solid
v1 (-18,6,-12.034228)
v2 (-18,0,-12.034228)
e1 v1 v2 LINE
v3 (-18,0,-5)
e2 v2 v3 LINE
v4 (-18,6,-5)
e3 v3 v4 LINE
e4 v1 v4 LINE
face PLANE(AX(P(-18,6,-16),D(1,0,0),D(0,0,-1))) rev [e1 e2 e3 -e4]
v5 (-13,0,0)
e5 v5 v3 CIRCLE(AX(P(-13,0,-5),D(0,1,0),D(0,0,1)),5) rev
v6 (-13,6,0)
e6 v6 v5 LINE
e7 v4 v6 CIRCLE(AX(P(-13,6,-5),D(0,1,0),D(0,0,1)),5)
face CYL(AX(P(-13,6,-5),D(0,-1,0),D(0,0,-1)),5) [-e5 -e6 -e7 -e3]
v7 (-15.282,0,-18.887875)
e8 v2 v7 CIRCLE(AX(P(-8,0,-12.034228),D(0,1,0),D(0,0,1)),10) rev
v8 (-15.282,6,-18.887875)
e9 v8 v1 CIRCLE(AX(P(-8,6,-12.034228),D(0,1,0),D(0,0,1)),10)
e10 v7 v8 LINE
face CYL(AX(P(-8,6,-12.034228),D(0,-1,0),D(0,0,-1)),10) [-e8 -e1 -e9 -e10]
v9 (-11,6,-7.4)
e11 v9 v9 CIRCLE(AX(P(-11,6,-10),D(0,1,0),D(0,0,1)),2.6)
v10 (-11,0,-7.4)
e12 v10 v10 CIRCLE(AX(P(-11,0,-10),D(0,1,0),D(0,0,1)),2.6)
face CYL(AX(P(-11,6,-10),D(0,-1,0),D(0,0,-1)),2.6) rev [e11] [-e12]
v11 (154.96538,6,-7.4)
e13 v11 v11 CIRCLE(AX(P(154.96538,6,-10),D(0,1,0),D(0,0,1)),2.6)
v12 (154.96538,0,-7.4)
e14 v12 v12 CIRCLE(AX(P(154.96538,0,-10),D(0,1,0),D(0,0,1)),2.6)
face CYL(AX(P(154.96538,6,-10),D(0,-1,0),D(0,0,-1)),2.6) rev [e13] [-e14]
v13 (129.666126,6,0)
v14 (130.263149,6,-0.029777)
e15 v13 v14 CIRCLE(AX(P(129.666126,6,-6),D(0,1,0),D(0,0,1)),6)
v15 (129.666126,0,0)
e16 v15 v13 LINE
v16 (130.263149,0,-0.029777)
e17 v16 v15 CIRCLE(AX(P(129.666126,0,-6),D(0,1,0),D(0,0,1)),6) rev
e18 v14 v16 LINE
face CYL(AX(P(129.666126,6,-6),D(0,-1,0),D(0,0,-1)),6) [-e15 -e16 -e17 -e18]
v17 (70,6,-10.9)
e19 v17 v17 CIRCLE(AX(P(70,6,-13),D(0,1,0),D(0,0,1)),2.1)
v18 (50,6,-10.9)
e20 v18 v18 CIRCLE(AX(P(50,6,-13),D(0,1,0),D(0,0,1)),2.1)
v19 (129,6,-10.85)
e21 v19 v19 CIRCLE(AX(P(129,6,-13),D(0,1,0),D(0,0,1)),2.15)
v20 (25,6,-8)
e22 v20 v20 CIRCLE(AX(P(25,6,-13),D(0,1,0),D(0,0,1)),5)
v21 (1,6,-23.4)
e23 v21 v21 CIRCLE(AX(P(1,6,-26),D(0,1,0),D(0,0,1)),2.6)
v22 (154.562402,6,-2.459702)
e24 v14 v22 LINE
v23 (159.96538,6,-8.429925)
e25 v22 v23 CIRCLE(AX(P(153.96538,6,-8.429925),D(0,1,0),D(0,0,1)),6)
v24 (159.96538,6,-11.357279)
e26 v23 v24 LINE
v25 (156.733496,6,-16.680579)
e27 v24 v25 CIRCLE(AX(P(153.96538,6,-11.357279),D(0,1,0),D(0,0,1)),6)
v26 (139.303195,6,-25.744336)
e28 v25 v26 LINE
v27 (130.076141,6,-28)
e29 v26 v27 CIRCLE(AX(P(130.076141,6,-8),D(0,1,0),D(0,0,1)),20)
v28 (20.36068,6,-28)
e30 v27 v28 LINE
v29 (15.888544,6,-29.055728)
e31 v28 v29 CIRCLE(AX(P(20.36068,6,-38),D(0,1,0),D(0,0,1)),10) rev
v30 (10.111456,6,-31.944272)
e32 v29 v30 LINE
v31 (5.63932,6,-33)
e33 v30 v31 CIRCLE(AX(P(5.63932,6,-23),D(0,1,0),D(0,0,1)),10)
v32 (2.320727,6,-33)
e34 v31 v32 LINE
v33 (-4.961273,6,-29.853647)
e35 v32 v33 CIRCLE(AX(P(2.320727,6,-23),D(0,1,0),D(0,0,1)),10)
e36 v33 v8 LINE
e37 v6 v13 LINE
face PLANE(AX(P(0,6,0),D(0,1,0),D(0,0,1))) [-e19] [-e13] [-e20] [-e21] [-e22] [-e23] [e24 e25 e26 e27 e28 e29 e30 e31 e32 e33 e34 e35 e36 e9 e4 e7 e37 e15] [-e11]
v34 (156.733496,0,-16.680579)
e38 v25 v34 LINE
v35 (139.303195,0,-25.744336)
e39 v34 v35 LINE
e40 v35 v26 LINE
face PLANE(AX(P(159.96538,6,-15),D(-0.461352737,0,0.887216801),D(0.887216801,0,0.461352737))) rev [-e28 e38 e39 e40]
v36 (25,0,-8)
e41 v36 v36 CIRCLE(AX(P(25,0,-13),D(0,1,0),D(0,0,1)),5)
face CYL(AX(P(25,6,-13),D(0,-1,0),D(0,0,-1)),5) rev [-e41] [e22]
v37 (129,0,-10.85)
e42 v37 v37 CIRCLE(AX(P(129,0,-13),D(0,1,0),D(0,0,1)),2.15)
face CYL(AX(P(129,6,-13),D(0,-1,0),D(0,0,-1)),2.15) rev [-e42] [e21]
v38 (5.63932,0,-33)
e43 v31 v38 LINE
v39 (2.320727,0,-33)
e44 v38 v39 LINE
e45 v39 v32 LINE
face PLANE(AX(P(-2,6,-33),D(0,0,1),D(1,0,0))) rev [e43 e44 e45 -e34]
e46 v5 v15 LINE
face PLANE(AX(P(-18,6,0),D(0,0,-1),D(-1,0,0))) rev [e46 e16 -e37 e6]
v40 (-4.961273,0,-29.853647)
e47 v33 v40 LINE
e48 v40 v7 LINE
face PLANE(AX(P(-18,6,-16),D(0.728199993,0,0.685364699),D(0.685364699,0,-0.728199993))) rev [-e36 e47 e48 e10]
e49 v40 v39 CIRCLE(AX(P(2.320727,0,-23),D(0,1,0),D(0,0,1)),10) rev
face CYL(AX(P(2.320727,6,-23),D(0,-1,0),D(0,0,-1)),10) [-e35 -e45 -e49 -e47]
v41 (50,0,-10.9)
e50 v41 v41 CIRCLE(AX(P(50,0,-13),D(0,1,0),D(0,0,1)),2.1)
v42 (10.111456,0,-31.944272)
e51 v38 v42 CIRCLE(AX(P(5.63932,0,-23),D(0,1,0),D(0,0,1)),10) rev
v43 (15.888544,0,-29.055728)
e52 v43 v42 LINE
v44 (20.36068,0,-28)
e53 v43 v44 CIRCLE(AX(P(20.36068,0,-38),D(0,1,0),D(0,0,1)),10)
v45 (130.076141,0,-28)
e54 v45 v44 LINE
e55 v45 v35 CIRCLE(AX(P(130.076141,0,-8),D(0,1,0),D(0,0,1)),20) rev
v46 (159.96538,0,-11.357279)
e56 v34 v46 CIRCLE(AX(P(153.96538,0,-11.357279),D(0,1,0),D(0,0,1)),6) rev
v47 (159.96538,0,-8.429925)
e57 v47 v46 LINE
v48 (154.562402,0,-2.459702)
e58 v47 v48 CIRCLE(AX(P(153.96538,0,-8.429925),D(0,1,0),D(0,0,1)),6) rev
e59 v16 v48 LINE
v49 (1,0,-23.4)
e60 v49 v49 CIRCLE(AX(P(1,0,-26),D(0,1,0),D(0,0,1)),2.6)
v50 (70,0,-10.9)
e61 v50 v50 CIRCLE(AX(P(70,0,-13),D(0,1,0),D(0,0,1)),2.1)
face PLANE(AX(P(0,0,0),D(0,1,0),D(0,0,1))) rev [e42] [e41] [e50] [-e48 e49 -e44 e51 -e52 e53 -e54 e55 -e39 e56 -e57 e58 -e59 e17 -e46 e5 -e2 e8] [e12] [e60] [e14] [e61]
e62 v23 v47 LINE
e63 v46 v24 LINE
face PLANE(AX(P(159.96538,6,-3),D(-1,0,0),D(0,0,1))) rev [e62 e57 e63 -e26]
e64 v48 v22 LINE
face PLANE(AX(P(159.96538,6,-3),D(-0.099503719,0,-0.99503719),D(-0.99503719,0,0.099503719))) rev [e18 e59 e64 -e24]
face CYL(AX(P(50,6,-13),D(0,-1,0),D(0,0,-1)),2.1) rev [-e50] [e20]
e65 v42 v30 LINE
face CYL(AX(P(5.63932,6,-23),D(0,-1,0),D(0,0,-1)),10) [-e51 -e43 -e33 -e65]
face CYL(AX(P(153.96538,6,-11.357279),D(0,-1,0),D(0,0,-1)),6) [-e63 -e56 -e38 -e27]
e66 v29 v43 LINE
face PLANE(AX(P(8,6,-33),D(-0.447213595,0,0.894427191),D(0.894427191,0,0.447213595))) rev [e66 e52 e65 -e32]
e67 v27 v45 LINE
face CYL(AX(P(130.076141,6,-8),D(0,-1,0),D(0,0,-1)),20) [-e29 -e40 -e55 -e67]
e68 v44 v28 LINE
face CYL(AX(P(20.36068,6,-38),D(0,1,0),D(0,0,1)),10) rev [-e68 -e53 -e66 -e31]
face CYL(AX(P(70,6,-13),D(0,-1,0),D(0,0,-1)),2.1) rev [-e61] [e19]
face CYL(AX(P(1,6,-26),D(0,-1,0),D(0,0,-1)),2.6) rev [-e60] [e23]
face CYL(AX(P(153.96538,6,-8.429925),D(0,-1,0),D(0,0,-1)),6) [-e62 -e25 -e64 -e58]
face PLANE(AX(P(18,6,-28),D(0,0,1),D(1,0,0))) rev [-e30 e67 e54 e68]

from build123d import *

# Parameters (mm, degrees)
SKETCH1_R           = 2.6
SKETCH1_R_2         = 2.15
SKETCH1_R_3         = 5
SKETCH1_R_4         = 2.1
BOSS_EXTRUDE1_DEPTH = 6
FILLET1_R           = 5
FILLET2_R           = 6
FILLET3_R           = 10
FILLET4_R           = 20
FILLET5_R           = 10


with BuildPart() as part:
    # Sketch1 → Boss-Extrude1 (new body)
    with BuildSketch(Plane(origin=(0, 0, 0), x_dir=(1, 0, 0), z_dir=(0, 1, 0))):
        Polygon((159.965380006, 15), (134.965380006, 28), (18, 28), (8, 33), (-2, 33), (-18, 16), (-18, 0), (0, 0), (129.965380006, 0), (159.965380006, 3), align=None)
        with Locations(Location((-11, 10, 0), (0, 0, 270))):
            Circle(SKETCH1_R, mode=Mode.SUBTRACT)
        with Locations(Location((129, 13, 0), (0, 0, 270))):
            Circle(SKETCH1_R_2, mode=Mode.SUBTRACT)
        with Locations(Location((25, 13, 0), (0, 0, 270))):
            Circle(SKETCH1_R_3, mode=Mode.SUBTRACT)
        with Locations(Location((154.965380006, 10, 0), (0, 0, 270))):
            Circle(SKETCH1_R, mode=Mode.SUBTRACT)
        with Locations(Location((1, 26, 0), (0, 0, 270))):
            Circle(SKETCH1_R, mode=Mode.SUBTRACT)
        with Locations(Location((50, 13, 0), (0, 0, 270))):
            Circle(SKETCH1_R_4, mode=Mode.SUBTRACT)
        with Locations(Location((70, 13, 0), (0, 0, 270))):
            Circle(SKETCH1_R_4, mode=Mode.SUBTRACT)
    extrude(amount=BOSS_EXTRUDE1_DEPTH)

    # Fillet1
    fillet1_edges = [part.edges().sort_by_distance(p)[0] for p in [
        (-18, 3, 0),
    ]]
    fillet(fillet1_edges, radius=FILLET1_R)

    # Fillet2
    # the kernel refuses this fillet: 6 mm, written as the material it takes off along each edge
    with BuildSketch(Plane(origin=(159.965380006, -9.106803364, -15), x_dir=(0, 0, 1), z_dir=(0, 1, 0))) as fillet2_piece_1:
        with BuildLine():
            CenterArc((FILLET2_R * 0.607120224288, -FILLET2_R), FILLET2_R, 90, 62.525568374)
            Line((-FILLET2_R * 0.280096576946, -FILLET2_R * 0.538647263358), (0, 0))
            Line((0, 0), (FILLET2_R * 0.607120224288, 0))
        make_face()
    extrude(amount=24.213606729, mode=Mode.SUBTRACT)
    with BuildSketch(Plane(origin=(159.965380006, -13.574813432, -3), x_dir=(-0.9950371902099892, 0, 0.0995037190209987), z_dir=(0, 1, 0))) as fillet2_piece_2:
        with BuildLine():
            CenterArc((FILLET2_R * 0.904987562112, -FILLET2_R), FILLET2_R, 90, 84.289406863)
            Line((-FILLET2_R * 0.0900496280979, -FILLET2_R * 0.900496280979), (0, 0))
            Line((0, 0), (FILLET2_R * 0.904987562112, 0))
        make_face()
    extrude(amount=33.149626863, mode=Mode.SUBTRACT)
    with BuildSketch(Plane(origin=(129.965380006, -0.748134317, 0), x_dir=(-1, 0, 0), z_dir=(0, 1, 0))) as fillet2_piece_3:
        with BuildLine():
            CenterArc((FILLET2_R * 0.0498756211209, -FILLET2_R), FILLET2_R, 90, 5.710593137)
            Line((-FILLET2_R * 0.0496280979001, -FILLET2_R * 0.00496280979001), (0, 0))
            Line((0, 0), (FILLET2_R * 0.0498756211209, 0))
        make_face()
    extrude(amount=7.496268634, mode=Mode.SUBTRACT)

    # Fillet3
    fillet3_edges = [part.edges().sort_by_distance(p)[0] for p in [
        (-18, 3, -16),
        (-2, 3, -33),
    ]]
    fillet(fillet3_edges, radius=FILLET3_R)

    # Fillet4
    fillet4_edges = [part.edges().sort_by_distance(p)[0] for p in [
        (134.965380006, 3, -28),
    ]]
    fillet(fillet4_edges, radius=FILLET4_R)

    # Fillet5
    fillet5_edges = [part.edges().sort_by_distance(p)[0] for p in [
        (8, 3, -33),
        (18, 3, -28),
    ]]
    fillet(fillet5_edges, radius=FILLET5_R)


solid = part.part
